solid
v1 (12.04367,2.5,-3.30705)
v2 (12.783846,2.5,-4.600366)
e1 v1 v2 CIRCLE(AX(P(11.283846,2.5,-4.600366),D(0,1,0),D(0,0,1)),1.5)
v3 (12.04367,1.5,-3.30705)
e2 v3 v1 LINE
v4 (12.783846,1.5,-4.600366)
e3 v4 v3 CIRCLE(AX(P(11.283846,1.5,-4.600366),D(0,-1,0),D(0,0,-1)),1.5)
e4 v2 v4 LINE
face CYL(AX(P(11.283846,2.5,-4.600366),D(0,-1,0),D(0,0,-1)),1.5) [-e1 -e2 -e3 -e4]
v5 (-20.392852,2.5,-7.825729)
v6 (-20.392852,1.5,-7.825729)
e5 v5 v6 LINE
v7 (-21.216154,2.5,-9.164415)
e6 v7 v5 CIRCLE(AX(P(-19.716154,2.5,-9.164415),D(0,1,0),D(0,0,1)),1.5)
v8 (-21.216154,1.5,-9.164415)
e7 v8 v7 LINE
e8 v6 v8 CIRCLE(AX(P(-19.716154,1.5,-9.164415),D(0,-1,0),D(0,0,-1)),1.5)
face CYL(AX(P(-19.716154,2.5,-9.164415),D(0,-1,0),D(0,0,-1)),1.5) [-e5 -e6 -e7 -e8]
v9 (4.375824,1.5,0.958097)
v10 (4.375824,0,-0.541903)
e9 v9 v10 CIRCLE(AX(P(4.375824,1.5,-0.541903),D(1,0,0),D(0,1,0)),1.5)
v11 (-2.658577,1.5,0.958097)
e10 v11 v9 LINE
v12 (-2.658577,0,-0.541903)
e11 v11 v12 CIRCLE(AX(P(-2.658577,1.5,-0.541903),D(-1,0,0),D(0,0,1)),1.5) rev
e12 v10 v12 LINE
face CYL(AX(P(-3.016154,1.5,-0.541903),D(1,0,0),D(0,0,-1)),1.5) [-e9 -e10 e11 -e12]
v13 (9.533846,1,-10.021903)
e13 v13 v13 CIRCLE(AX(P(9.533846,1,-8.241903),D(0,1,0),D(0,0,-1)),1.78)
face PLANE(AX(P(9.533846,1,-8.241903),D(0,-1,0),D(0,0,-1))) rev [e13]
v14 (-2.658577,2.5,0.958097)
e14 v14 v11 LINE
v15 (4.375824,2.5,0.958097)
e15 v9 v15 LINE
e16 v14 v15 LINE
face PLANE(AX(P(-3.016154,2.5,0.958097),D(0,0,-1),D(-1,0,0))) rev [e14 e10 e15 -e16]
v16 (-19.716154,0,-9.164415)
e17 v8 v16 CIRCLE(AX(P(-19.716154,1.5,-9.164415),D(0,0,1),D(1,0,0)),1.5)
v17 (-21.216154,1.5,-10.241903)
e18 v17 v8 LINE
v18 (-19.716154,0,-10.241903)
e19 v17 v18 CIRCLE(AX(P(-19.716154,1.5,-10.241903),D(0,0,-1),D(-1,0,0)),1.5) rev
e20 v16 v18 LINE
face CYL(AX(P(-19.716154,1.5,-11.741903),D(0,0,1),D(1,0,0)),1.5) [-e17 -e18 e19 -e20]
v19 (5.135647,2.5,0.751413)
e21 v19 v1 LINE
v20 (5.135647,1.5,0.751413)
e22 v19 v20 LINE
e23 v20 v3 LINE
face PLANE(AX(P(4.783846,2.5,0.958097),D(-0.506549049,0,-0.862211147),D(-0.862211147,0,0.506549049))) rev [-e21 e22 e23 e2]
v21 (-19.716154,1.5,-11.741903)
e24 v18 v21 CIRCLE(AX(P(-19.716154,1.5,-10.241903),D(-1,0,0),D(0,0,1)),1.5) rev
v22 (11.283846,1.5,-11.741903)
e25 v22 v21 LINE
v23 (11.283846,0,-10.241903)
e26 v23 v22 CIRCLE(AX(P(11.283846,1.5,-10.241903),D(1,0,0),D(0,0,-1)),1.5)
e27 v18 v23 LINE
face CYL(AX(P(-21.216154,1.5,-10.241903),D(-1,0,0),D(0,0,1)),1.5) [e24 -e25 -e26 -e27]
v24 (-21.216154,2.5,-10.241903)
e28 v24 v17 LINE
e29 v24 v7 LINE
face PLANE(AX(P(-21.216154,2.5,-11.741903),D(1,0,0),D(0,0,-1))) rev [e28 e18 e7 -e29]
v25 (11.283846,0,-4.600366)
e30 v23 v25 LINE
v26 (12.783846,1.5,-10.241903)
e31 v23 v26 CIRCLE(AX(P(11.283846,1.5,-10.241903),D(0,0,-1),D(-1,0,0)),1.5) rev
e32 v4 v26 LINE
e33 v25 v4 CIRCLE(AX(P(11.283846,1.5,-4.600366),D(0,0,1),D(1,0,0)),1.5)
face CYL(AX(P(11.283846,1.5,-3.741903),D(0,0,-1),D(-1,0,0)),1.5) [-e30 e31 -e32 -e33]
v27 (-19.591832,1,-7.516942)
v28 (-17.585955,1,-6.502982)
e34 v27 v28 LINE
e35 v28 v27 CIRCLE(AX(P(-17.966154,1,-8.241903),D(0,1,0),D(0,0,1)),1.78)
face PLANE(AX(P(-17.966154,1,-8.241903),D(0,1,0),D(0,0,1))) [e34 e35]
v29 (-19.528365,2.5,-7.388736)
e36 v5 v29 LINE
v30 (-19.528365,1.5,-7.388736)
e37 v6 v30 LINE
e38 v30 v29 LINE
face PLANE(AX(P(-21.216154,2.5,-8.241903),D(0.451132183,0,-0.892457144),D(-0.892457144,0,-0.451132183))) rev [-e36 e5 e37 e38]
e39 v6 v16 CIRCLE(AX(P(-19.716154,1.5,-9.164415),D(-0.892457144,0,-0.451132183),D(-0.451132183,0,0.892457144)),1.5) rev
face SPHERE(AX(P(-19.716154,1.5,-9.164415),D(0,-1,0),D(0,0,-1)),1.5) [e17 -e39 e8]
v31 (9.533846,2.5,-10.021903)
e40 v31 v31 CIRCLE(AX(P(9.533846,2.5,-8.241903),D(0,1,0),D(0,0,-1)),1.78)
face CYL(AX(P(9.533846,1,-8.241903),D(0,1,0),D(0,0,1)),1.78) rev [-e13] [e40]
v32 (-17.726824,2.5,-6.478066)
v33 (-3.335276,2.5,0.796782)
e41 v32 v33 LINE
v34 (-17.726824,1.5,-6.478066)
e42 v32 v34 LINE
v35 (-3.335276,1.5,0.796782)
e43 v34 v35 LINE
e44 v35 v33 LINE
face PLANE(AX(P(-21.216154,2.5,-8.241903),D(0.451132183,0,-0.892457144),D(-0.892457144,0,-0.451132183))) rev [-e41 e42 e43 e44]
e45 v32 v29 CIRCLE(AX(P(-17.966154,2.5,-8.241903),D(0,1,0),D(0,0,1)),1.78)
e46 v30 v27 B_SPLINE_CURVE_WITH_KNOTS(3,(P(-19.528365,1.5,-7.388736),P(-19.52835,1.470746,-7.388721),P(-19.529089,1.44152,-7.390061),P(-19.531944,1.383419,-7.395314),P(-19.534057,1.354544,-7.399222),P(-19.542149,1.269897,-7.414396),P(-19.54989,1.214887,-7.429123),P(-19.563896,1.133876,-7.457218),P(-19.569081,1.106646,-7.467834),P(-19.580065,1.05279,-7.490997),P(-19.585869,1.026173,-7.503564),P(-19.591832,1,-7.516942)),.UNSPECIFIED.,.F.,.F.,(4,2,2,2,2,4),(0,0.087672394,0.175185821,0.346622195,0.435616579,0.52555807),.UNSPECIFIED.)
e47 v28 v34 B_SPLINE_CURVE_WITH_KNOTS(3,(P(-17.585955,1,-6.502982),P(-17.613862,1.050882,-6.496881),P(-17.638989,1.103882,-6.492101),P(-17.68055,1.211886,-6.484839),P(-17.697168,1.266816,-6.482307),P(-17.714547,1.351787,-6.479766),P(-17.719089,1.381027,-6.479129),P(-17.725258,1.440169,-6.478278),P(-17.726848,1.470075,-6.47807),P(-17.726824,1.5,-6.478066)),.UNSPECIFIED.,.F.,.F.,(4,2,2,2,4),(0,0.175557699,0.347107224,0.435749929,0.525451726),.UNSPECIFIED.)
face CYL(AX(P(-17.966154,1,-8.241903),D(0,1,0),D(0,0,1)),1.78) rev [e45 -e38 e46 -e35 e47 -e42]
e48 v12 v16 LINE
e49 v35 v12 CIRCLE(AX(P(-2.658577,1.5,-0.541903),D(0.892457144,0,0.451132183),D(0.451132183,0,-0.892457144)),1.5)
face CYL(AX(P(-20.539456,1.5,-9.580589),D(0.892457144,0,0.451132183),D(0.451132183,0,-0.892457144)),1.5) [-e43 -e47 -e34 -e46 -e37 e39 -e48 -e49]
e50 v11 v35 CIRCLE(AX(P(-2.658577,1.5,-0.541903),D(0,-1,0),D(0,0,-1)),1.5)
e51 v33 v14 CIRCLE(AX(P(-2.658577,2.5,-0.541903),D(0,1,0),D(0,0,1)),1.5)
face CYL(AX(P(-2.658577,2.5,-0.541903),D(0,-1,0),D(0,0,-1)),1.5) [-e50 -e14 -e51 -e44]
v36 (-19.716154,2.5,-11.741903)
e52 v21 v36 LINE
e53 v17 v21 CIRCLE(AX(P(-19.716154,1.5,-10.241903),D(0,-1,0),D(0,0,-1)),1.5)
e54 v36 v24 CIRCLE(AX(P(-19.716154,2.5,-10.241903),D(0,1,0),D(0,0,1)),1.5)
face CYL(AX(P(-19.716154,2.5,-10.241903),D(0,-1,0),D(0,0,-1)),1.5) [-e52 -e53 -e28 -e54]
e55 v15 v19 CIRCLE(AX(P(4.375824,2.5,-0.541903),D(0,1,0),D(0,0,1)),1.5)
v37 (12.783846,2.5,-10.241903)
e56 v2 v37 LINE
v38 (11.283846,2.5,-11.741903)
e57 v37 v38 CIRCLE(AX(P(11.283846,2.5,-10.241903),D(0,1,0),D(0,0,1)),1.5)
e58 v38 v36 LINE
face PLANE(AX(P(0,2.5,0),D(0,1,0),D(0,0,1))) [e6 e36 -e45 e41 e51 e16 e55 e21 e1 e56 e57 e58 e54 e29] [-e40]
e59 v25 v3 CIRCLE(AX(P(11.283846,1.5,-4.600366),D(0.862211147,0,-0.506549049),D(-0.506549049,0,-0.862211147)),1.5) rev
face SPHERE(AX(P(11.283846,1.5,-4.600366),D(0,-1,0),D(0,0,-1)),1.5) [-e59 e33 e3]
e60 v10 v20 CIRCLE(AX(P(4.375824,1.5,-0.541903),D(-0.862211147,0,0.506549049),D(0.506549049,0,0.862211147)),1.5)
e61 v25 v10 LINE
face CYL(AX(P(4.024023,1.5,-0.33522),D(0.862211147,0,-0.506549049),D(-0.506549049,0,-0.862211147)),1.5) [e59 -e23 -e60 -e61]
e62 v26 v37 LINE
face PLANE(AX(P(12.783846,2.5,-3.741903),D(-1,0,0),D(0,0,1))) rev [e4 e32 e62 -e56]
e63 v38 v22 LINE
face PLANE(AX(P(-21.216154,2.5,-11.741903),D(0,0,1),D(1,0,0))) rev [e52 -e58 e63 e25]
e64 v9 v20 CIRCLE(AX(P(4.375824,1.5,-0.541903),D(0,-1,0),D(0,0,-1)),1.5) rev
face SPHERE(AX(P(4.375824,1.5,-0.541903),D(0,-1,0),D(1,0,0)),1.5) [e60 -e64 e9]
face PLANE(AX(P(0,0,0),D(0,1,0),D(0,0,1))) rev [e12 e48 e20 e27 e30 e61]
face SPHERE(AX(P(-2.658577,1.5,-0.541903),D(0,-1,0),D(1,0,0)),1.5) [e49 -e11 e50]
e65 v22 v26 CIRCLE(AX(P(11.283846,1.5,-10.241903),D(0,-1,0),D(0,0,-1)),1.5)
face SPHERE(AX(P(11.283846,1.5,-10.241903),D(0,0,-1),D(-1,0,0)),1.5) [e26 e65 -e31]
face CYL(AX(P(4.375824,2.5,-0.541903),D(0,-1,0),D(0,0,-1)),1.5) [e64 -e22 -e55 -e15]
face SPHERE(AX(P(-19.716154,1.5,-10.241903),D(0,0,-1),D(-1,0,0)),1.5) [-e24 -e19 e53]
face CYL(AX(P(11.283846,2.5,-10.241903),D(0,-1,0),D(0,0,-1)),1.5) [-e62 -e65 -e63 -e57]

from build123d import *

# Parameters (mm, degrees)
BOSS_EXTRUDE1_DEPTH = 2.5
SKETCH4_R           = 1.78
CUT_EXTRUDE1_DEPTH  = 1.5
FILLET1_R           = 1.5


with BuildPart() as part:
    # Sketch2 → Boss-Extrude1 (new body)
    with BuildSketch(Plane(origin=(0, 0, 0), x_dir=(1, 0, 0), z_dir=(0, 1, 0))):
        Polygon((-21.216153836, 11.741903429), (-21.216153836, 8.241903429), (-3.016153836, -0.958096571), (4.783846164, -0.958096571), (12.783846164, 3.741903429), (12.783846164, 11.741903429), align=None)
    extrude(amount=BOSS_EXTRUDE1_DEPTH)

    # Sketch4 → Cut-Extrude1 (cut)
    with BuildSketch(Plane(origin=(0, 2.5, 0), x_dir=(1, 0, 0), z_dir=(0, 1, 0))):
        with Locations((-17.966153836, 8.241903429)):
            Circle(SKETCH4_R)
        with Locations(Location((9.533846164, 8.241903429, 0), (0, 0, 90))):
            Circle(SKETCH4_R)
    extrude(amount=-CUT_EXTRUDE1_DEPTH, mode=Mode.SUBTRACT)

    # Fillet1
    # the kernel refuses this fillet: 1.5 mm, written as the material it takes off along each edge
    with BuildSketch(Plane(origin=(4.375823919, 1.5, -0.541903429), x_dir=(0.5065490486308655, 0, 0.8622111466057285), z_dir=(0, -1, 0))) as fillet1_piece_1_section:
        Polygon((0, 0), (FILLET1_R, 0), (FILLET1_R, FILLET1_R * 0.272014830087), (FILLET1_R * 0.862211146606, FILLET1_R * 0.506549048631), align=None)
    fillet1_piece_1 = extrude(amount=FILLET1_R, mode=Mode.PRIVATE)
    fillet1_piece_1 = fillet1_piece_1 - Plane(origin=(4.375823919, 1.5, -0.541903429), x_dir=(-0.2624774784569825, 0, -0.964938118898235), z_dir=(0, -1, 0)) * Sphere(FILLET1_R, mode=Mode.PRIVATE)
    add(fillet1_piece_1, mode=Mode.SUBTRACT)
    with BuildSketch(Plane(origin=(-2.658577298, 1.5, -0.541903429), x_dir=(-0.4511321826525704, 0, 0.8924571439431296), z_dir=(0, -1, 0))) as fillet1_piece_2_section:
        Polygon((0, 0), (FILLET1_R, 0), (FILLET1_R, -FILLET1_R * 0.238384358714), (FILLET1_R * 0.892457143943, -FILLET1_R * 0.451132182653), align=None)
    fillet1_piece_2 = extrude(amount=FILLET1_R, mode=Mode.PRIVATE)
    fillet1_piece_2 = fillet1_piece_2 - Plane(origin=(-2.658577298, 1.5, -0.541903429), x_dir=(0.23188667065710186, 0, -0.972742808748317), z_dir=(0, -1, 0)) * Sphere(FILLET1_R, mode=Mode.PRIVATE)
    add(fillet1_piece_2, mode=Mode.SUBTRACT)
    with BuildSketch(Plane(origin=(-19.716153836, 1.5, -10.241903429), x_dir=(0, -1, 0), z_dir=(-1, 0, 0))) as fillet1_piece_3_section:
        Polygon((0, 0), (FILLET1_R, 0), (FILLET1_R, -FILLET1_R), (0, -FILLET1_R), align=None)
    fillet1_piece_3 = extrude(amount=FILLET1_R, mode=Mode.PRIVATE)
    fillet1_piece_3 = fillet1_piece_3 - Plane(origin=(-19.716153836, 1.5, -10.241903429), x_dir=(0, 0.7071067811865475, 0.7071067811865475), z_dir=(-1, 0, 0)) * Sphere(FILLET1_R, mode=Mode.PRIVATE)
    add(fillet1_piece_3, mode=Mode.SUBTRACT)
    with BuildSketch(Plane(origin=(-19.716153836, 1.5, -9.164414646), x_dir=(-0.4511321826525704, 0, 0.8924571439431296), z_dir=(0, -1, 0))) as fillet1_piece_4_section:
        Polygon((0, 0), (FILLET1_R, 0), (FILLET1_R, FILLET1_R * 0.615007478031), (FILLET1_R * 0.451132182653, FILLET1_R * 0.892457143943), align=None)
    fillet1_piece_4 = extrude(amount=FILLET1_R, mode=Mode.PRIVATE)
    fillet1_piece_4 = fillet1_piece_4 - Plane(origin=(-19.716153836, 1.5, -9.164414646), x_dir=(0.8518016737047921, 0, -0.5238643991279756), z_dir=(0, -1, 0)) * Sphere(FILLET1_R, mode=Mode.PRIVATE)
    add(fillet1_piece_4, mode=Mode.SUBTRACT)
    with BuildSketch(Plane(origin=(11.283846164, 1.5, -4.600366498), x_dir=(1, 0, 0), z_dir=(0, -1, 0))) as fillet1_piece_5_section:
        Polygon((0, 0), (FILLET1_R, 0), (FILLET1_R, FILLET1_R * 0.572308712676), (FILLET1_R * 0.506549048631, FILLET1_R * 0.862211146606), align=None)
    fillet1_piece_5 = extrude(amount=FILLET1_R, mode=Mode.PRIVATE)
    fillet1_piece_5 = fillet1_piece_5 - Plane(origin=(11.283846164, 1.5, -4.600366498), x_dir=(-0.8679138922240112, 0, -0.49671468237265487), z_dir=(0, -1, 0)) * Sphere(FILLET1_R, mode=Mode.PRIVATE)
    add(fillet1_piece_5, mode=Mode.SUBTRACT)
    with BuildSketch(Plane(origin=(11.283846164, 1.5, -10.241903429), x_dir=(0, 0, -1), z_dir=(0, -1, 0))) as fillet1_piece_6_section:
        Polygon((0, 0), (FILLET1_R, 0), (FILLET1_R, FILLET1_R), (0, FILLET1_R), align=None)
    fillet1_piece_6 = extrude(amount=FILLET1_R, mode=Mode.PRIVATE)
    fillet1_piece_6 = fillet1_piece_6 - Plane(origin=(11.283846164, 1.5, -10.241903429), x_dir=(-0.7071067811865477, 0, 0.7071067811865474), z_dir=(0, -1, 0)) * Sphere(FILLET1_R, mode=Mode.PRIVATE)
    add(fillet1_piece_6, mode=Mode.SUBTRACT)
    with BuildSketch(Plane(origin=(4.783846164, 1.5, 0.958096571), x_dir=(0.8622111466057288, 0, -0.506549048630865), z_dir=(0, 1, 0))) as fillet1_piece_7:
        with BuildLine():
            CenterArc((FILLET1_R * 0.272014830087, FILLET1_R), FILLET1_R, 239.565764247, 30.434235753)
            Line((-FILLET1_R * 0.234534218543, FILLET1_R * 0.137788853394), (0, 0))
            Line((0, 0), (FILLET1_R * 0.272014830087, 0))
        make_face()
    extrude(amount=2.020055613, mode=Mode.SUBTRACT)
    with BuildSketch(Plane(origin=(-3.016153836, 1.5, 0.958096571), x_dir=(1, 0, 0), z_dir=(0, 1, 0))) as fillet1_piece_8:
        with BuildLine():
            CenterArc((FILLET1_R * 0.238384358714, FILLET1_R), FILLET1_R, 243.183653156, 26.816346844)
            Line((-FILLET1_R * 0.212747823939, FILLET1_R * 0.107542856057), (0, 0))
            Line((0, 0), (FILLET1_R * 0.238384358714, 0))
        make_face()
    extrude(amount=1.893941345, mode=Mode.SUBTRACT)
    with BuildSketch(Plane(origin=(-21.216153836, 0, -10.241903429), x_dir=(0, 1, 0), z_dir=(0, 0, 1))) as fillet1_piece_9:
        with BuildLine():
            CenterArc((FILLET1_R, -FILLET1_R), FILLET1_R, 90, 90)
            Line((0, -FILLET1_R), (0, 0))
            Line((0, 0), (FILLET1_R, 0))
        make_face()
    extrude(amount=1.077488783, mode=Mode.SUBTRACT)
    with BuildSketch(Plane(origin=(-20.39285211, 0, -7.825728931), x_dir=(0.4511321826525704, 0, -0.8924571439431296), z_dir=(0.8924571439431296, 0, 0.4511321826525704))) as fillet1_piece_10:
        with BuildLine():
            CenterArc((FILLET1_R, FILLET1_R), FILLET1_R, 180, 90)
            Line((0, FILLET1_R), (0, 0))
            Line((0, 0), (FILLET1_R, 0))
        make_face()
    extrude(amount=19.113048345, mode=Mode.SUBTRACT)
    with BuildSketch(Plane(origin=(-2.658577298, 0, 0.958096571), x_dir=(0, 1, 0), z_dir=(1, 0, 0))) as fillet1_piece_11:
        with BuildLine():
            CenterArc((FILLET1_R, -FILLET1_R), FILLET1_R, 90, 90)
            Line((0, -FILLET1_R), (0, 0))
            Line((0, 0), (FILLET1_R, 0))
        make_face()
    extrude(amount=7.034401217, mode=Mode.SUBTRACT)
    with BuildSketch(Plane(origin=(5.135647492, 0, 0.751413291), x_dir=(0, 1, 0), z_dir=(0.8622111466057285, 0, -0.5065490486308655))) as fillet1_piece_12:
        with BuildLine():
            CenterArc((FILLET1_R, -FILLET1_R), FILLET1_R, 90, 90)
            Line((0, -FILLET1_R), (0, 0))
            Line((0, 0), (FILLET1_R, 0))
        make_face()
    extrude(amount=8.011984387, mode=Mode.SUBTRACT)
    with BuildSketch(Plane(origin=(12.783846164, 1.5, -3.741903429), x_dir=(0, 0, -1), z_dir=(0, 1, 0))) as fillet1_piece_13:
        with BuildLine():
            CenterArc((FILLET1_R * 0.572308712676, FILLET1_R), FILLET1_R, 210.434235753, 59.565764247)
            Line((-FILLET1_R * 0.289902433929, FILLET1_R * 0.493450951369), (0, 0))
            Line((0, 0), (FILLET1_R * 0.572308712676, 0))
        make_face()
    extrude(amount=3.146157673, mode=Mode.SUBTRACT)
    with BuildSketch(Plane(origin=(12.783846164, 0, -4.600366498), x_dir=(0, 1, 0), z_dir=(0, 0, -1))) as fillet1_piece_14:
        with BuildLine():
            CenterArc((FILLET1_R, -FILLET1_R), FILLET1_R, 90, 90)
            Line((0, -FILLET1_R), (0, 0))
            Line((0, 0), (FILLET1_R, 0))
        make_face()
    extrude(amount=5.641536931, mode=Mode.SUBTRACT)
    with BuildSketch(Plane(origin=(11.283846164, 0, -11.741903429), x_dir=(0, 0, 1), z_dir=(-1, 0, 0))) as fillet1_piece_15:
        with BuildLine():
            CenterArc((FILLET1_R, FILLET1_R), FILLET1_R, 180, 90)
            Line((0, FILLET1_R), (0, 0))
            Line((0, 0), (FILLET1_R, 0))
        make_face()
    extrude(amount=31, mode=Mode.SUBTRACT)
    with BuildSketch(Plane(origin=(12.783846164, 1.5, -11.741903429), x_dir=(0, 0, 1), z_dir=(0, 1, 0))) as fillet1_piece_16:
        with BuildLine():
            CenterArc((FILLET1_R, -FILLET1_R), FILLET1_R, 90, 90)
            Line((0, -FILLET1_R), (0, 0))
            Line((0, 0), (FILLET1_R, 0))
        make_face()
    extrude(amount=4.75, mode=Mode.SUBTRACT)
    with BuildSketch(Plane(origin=(-21.216153836, 1.5, -8.241903429), x_dir=(0, 0, -1), z_dir=(0, 1, 0))) as fillet1_piece_17:
        with BuildLine():
            CenterArc((FILLET1_R * 0.615007478031, -FILLET1_R), FILLET1_R, 90, 63.183653156)
            Line((-FILLET1_R * 0.277449665912, -FILLET1_R * 0.548867817347), (0, 0))
            Line((0, 0), (FILLET1_R * 0.615007478031, 0))
        make_face()
    extrude(amount=3.306278043, mode=Mode.SUBTRACT)
    with BuildSketch(Plane(origin=(-21.216153836, 1.5, -11.741903429), x_dir=(0, 0, 1), z_dir=(0, 1, 0))) as fillet1_piece_18:
        with BuildLine():
            CenterArc((FILLET1_R, FILLET1_R), FILLET1_R, 180, 90)
            Line((0, FILLET1_R), (0, 0))
            Line((0, 0), (FILLET1_R, 0))
        make_face()
    extrude(amount=4.75, mode=Mode.SUBTRACT)


solid = part.part
